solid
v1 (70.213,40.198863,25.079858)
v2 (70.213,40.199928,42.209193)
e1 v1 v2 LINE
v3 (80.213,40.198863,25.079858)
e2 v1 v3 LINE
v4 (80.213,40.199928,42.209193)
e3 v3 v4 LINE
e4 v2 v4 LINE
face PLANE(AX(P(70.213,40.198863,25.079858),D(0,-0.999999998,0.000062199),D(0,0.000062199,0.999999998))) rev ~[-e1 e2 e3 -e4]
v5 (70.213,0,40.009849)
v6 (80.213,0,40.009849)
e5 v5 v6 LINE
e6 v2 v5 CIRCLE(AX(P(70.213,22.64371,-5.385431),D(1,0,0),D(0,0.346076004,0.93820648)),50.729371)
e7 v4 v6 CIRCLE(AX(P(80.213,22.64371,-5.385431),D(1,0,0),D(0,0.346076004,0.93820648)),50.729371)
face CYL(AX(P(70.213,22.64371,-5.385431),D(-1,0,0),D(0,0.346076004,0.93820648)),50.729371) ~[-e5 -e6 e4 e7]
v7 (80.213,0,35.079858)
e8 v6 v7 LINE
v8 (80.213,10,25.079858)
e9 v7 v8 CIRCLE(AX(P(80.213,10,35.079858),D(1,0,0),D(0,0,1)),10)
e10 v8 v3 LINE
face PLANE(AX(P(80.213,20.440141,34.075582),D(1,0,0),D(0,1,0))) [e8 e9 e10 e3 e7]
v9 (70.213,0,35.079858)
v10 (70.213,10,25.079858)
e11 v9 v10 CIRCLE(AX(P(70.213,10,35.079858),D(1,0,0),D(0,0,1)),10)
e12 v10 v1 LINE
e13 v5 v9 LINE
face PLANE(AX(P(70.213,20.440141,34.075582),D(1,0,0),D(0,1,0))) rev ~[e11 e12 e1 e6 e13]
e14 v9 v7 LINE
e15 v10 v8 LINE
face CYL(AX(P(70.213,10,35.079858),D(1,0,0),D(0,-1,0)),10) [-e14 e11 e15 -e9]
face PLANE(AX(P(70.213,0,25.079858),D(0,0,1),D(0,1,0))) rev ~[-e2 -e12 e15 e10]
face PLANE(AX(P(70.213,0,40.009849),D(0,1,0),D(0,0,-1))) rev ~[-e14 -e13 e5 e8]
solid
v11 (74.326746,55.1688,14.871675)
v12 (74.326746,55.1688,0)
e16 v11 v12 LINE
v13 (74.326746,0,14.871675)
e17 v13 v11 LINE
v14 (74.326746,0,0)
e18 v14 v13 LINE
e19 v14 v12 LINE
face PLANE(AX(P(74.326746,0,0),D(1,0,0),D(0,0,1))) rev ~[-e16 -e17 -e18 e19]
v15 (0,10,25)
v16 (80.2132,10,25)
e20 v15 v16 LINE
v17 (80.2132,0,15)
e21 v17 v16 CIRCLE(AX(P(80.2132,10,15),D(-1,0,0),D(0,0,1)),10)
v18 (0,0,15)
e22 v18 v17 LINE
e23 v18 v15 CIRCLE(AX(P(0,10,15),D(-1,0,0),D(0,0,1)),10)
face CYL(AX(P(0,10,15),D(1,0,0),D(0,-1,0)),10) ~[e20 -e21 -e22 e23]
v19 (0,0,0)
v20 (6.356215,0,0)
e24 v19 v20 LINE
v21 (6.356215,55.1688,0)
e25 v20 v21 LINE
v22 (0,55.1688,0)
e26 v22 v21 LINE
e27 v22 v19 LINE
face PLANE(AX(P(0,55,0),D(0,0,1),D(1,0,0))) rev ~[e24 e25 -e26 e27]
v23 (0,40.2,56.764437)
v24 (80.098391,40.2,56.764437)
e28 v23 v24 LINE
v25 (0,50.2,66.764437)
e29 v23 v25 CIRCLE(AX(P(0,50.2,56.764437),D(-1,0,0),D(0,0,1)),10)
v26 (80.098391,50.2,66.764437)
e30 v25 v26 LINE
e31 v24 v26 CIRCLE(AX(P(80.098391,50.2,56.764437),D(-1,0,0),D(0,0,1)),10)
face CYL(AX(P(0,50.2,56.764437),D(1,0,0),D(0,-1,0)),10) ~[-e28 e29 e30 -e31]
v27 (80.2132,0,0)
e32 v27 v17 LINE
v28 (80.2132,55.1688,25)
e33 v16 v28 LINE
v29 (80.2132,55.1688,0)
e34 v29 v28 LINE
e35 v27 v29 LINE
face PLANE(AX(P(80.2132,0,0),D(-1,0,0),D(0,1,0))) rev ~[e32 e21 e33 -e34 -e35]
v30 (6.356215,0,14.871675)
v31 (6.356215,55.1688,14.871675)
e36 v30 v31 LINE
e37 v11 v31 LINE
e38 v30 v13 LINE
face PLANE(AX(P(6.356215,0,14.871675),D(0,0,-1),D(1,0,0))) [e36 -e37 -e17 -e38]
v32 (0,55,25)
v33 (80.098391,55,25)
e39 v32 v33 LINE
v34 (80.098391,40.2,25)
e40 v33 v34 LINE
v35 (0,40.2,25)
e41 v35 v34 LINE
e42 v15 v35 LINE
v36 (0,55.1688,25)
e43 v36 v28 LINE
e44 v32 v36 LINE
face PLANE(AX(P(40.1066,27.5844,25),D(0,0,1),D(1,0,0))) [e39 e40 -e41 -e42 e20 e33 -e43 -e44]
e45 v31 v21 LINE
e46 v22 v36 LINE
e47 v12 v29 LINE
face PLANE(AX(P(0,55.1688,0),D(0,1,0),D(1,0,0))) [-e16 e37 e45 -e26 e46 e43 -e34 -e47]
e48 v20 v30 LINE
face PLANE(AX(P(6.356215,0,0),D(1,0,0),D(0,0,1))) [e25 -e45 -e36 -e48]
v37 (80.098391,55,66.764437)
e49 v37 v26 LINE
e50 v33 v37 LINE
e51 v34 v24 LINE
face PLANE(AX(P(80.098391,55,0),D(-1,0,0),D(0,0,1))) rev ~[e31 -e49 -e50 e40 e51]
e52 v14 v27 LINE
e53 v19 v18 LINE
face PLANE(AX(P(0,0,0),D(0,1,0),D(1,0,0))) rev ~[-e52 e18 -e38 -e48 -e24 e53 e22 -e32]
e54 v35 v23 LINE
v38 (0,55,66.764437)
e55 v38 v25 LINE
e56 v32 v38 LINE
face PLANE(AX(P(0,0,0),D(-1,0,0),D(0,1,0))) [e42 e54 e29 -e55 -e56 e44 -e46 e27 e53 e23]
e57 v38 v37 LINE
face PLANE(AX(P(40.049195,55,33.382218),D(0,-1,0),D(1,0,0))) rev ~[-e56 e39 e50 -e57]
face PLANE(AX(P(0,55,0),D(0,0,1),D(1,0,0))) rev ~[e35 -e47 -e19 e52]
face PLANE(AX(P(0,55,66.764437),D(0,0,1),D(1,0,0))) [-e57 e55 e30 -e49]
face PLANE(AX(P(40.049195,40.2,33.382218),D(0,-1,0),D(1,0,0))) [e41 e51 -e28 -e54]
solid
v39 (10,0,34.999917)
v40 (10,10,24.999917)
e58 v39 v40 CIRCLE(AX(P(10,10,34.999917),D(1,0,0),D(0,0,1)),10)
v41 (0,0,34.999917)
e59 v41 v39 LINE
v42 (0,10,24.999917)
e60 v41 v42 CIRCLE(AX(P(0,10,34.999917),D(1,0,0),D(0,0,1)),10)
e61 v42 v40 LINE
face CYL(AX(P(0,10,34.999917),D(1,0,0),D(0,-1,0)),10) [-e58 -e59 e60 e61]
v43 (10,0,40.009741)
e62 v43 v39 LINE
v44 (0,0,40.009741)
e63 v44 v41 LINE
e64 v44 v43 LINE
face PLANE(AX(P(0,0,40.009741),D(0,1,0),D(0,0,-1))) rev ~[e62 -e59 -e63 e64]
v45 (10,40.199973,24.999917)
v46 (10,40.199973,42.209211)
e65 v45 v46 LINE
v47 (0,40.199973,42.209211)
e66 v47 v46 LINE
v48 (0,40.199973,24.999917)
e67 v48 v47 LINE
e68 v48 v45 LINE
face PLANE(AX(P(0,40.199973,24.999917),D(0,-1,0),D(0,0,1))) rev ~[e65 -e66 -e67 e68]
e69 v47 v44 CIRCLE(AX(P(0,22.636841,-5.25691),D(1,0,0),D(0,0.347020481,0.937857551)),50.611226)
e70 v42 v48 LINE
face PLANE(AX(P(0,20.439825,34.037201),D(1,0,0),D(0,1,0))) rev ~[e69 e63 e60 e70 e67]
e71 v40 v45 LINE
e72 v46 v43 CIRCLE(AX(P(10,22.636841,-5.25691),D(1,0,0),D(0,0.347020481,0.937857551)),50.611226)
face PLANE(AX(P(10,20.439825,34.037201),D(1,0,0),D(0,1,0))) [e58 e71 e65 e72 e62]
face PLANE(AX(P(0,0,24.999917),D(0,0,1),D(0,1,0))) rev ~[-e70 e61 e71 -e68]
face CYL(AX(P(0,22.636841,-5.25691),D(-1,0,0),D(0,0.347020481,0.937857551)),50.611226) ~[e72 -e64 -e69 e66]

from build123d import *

# Parameters (mm, degrees)
F0_W      = 80.2132
F0_H      = 55.1688
F1_DEPTH  = 25
F3_W      = 80.0983905792
F3_H      = 66.7644366622
F4_DEPTH  = 14.8
F6_DEPTH  = 10
F9_DEPTH  = 10
F10_W     = 67.9705310613
F10_H     = 14.8716745898
F11_DEPTH = 99
F12_R     = 10
F12_2_R   = 10
F12_3_R   = 10


with BuildPart() as f1:
    # F0 (on Top) → F1 (new body)
    with BuildSketch(Plane.XY):
        with Locations((40.1066, 27.5844)):
            Rectangle(F0_W, F0_H)
    extrude(amount=F1_DEPTH)

    # F3 (on offset) → F4 (join)
    with BuildSketch(Plane.XZ.offset(-55)):
        with Locations((40.0491952896, 33.3822183311)):
            Rectangle(F3_W, F3_H)
    extrude(amount=F4_DEPTH)

    # F10 (on Front) → F11 (cut)
    with BuildSketch(Plane.XZ):
        with Locations((40.3414806351, 7.4358372949)):
            Rectangle(F10_W, F10_H)
    extrude(amount=-F11_DEPTH, mode=Mode.SUBTRACT)

    # F12
    f12_edges = [f1.edges().sort_by_distance(p)[0] for p in [
        (40.1066, 0, 25),
        (40.049195, 40.2, 66.764437),
    ]]
    fillet(f12_edges, radius=F12_R)


with BuildPart() as f6:
    # F5 (on Right) → F6 (new body)
    with BuildSketch(Plane.YZ):
        with BuildLine():
            Line((40.1999726892, 24.9999165535), (40.1999726892, 42.2092106919))
            ThreePointArc((40.1999726892, 42.2092106919), (19.8718728741, 45.2787326204), (0, 40.0097407401))
            Line((0, 40.0097407401), (0, 24.9999165535))
            Line((0, 24.9999165535), (40.1999726892, 24.9999165535))
        make_face()
    extrude(amount=F6_DEPTH)

    # F12#2
    f12_2_edges = [f6.edges().sort_by_distance(p)[0] for p in [
        (5, 0, 24.999917),
    ]]
    fillet(f12_2_edges, radius=F12_2_R)


with BuildPart() as f9:
    # F8 (on offset) → F9 (new body)
    with BuildSketch(Plane.YZ.offset(70.213)):
        with BuildLine():
            Line((40.1988625526, 25.079857558), (40.1999279857, 42.2091931105))
            ThreePointArc((40.1999279857, 42.2091931105), (19.8724426746, 45.2681878924), (0, 40.0098487735))
            Line((0, 40.0098487735), (0, 25.079857558))
            Line((0, 25.079857558), (40.1988625526, 25.079857558))
        make_face()
    extrude(amount=F9_DEPTH)

    # F12#3
    f12_3_edges = [f9.edges().sort_by_distance(p)[0] for p in [
        (75.213, 0, 25.079858),
    ]]
    fillet(f12_3_edges, radius=F12_3_R)


solid = Compound([f1.part, f6.part, f9.part])
